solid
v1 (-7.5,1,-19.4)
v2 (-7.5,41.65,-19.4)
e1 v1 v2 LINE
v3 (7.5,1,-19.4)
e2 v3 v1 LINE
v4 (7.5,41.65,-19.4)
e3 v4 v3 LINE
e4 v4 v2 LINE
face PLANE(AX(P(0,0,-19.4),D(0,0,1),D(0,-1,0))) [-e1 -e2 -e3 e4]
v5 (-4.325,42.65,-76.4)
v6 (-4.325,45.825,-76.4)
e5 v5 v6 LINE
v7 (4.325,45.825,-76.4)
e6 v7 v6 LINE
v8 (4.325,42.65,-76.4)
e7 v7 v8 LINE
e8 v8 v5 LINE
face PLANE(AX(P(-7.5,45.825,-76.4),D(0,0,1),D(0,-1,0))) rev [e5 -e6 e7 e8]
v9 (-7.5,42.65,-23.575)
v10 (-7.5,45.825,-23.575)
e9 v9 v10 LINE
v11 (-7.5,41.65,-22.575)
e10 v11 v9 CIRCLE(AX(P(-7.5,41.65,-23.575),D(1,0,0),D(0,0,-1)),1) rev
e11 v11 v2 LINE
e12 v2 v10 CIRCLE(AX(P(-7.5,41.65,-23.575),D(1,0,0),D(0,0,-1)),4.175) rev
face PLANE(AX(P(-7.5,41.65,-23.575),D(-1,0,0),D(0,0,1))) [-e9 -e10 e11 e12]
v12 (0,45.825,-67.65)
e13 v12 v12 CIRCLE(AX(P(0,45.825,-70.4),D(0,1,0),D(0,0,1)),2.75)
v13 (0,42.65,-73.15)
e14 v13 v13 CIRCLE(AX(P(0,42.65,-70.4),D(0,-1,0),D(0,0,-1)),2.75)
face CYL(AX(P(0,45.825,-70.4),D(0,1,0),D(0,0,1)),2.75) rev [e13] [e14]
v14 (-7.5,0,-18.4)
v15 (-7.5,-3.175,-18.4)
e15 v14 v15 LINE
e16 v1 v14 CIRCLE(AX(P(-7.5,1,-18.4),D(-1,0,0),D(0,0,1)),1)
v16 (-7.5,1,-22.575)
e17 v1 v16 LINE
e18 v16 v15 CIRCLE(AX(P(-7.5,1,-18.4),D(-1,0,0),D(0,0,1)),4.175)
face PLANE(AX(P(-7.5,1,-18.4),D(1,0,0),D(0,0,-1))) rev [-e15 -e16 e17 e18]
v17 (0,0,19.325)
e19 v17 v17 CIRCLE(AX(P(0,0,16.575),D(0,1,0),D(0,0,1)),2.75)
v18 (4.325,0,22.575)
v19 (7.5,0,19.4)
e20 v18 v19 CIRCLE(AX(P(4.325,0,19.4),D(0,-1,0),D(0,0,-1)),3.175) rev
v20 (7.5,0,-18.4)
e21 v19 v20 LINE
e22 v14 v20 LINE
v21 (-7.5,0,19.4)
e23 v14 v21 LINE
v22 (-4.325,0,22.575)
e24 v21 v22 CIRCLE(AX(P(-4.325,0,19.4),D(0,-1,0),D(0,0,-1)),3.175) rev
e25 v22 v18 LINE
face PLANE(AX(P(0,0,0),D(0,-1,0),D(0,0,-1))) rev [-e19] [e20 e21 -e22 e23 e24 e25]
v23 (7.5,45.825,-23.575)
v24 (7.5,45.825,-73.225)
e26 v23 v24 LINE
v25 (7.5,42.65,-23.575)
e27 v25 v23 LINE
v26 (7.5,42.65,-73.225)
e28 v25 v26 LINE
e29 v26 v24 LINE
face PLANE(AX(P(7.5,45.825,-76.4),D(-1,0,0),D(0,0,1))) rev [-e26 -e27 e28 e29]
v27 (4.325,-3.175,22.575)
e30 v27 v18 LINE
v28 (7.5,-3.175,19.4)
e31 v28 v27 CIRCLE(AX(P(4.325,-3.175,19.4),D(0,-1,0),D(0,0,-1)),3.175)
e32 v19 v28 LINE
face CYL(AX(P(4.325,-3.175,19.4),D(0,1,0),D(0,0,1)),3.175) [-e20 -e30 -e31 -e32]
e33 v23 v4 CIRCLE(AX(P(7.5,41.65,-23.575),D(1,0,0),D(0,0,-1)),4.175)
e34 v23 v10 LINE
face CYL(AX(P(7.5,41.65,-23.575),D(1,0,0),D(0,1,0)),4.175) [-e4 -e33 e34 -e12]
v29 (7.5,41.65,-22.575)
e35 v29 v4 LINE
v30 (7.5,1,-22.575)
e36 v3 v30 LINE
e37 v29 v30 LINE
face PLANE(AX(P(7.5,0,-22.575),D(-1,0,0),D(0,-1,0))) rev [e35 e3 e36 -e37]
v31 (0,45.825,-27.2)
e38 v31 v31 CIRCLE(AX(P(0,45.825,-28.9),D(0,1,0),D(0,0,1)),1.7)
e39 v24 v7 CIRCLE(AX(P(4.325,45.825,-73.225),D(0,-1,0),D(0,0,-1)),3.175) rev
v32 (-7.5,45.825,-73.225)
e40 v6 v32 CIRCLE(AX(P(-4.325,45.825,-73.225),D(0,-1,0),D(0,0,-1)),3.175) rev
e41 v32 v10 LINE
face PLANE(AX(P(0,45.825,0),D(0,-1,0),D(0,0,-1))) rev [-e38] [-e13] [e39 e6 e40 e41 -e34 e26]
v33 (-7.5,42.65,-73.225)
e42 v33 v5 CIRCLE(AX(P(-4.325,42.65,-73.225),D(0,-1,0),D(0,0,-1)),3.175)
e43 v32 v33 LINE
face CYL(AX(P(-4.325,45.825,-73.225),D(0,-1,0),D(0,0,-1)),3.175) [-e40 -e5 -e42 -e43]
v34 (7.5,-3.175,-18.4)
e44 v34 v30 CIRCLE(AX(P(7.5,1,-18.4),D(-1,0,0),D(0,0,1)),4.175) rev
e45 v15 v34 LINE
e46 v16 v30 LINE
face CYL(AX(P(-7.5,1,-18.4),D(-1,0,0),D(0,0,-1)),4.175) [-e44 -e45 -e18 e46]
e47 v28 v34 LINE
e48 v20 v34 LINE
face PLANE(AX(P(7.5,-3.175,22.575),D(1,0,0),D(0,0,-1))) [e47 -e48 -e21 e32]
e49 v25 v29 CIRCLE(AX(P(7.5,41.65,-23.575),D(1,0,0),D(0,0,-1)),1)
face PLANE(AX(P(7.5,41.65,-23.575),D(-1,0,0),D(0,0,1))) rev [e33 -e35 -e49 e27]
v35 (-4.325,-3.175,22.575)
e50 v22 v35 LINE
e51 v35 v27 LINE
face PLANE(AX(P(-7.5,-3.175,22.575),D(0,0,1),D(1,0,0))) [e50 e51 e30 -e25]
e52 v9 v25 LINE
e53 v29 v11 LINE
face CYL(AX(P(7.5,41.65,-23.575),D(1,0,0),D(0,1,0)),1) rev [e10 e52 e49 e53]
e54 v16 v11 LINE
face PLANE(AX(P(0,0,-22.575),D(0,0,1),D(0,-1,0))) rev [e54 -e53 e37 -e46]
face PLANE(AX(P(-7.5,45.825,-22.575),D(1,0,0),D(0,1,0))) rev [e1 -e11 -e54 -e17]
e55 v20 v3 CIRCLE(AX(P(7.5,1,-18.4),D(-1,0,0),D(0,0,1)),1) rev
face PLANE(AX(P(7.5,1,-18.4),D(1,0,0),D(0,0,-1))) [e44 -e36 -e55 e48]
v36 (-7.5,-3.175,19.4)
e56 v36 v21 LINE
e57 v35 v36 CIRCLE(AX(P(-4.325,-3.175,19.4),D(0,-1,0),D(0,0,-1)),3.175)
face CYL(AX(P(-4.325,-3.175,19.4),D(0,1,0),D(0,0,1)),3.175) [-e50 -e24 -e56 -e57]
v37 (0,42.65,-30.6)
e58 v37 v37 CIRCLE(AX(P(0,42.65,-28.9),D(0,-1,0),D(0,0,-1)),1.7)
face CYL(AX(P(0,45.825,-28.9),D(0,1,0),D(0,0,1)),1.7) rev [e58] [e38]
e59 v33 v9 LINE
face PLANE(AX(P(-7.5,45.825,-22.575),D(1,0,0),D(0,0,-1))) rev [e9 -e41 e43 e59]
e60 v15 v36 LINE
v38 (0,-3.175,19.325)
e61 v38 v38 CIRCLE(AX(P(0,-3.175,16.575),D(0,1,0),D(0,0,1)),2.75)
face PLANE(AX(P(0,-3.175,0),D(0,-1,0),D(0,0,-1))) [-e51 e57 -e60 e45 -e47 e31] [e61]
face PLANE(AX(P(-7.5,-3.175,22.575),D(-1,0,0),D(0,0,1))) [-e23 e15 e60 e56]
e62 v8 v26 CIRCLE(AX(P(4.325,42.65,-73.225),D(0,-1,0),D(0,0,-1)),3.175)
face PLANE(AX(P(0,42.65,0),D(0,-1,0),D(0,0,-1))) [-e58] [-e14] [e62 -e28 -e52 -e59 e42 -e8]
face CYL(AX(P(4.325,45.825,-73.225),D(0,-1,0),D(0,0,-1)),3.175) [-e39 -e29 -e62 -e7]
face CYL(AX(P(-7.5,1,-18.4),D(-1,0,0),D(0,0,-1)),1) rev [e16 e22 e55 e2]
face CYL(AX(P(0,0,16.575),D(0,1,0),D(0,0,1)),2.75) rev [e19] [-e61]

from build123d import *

# Parameters (mm, degrees)
SKETCH1_W                    = 15
SKETCH1_H                    = 45.15
BASE_FLANGE1_DEPTH           = 3.175
EDGE_FLANGE1_STRIP_W         = 14.7
EDGE_FLANGE1_STRIP_H         = 3.175
EDGE_FLANGE1_STRIP_CUT_DEPTH = 15
EDGE_FLANGE1_DEPTH           = 15
EDGE_FLANGE2_STRIP_W         = 14.7
EDGE_FLANGE2_STRIP_H         = 3.175
EDGE_FLANGE2_STRIP_CUT_DEPTH = 15
EDGE_FLANGE2_DEPTH           = 15
M5_CLEARANCE_HOLE2_D         = 5.5
M5_CLEARANCE_HOLE1_D         = 5.5
M3_CLEARANCE_HOLE1_D         = 3.4
FILLET1_R                    = 3.175


# Sheet-metal steps are written as plain solids
with BuildPart() as part:
    # Sketch1 → Base-Flange1 (new body)
    with BuildSketch(Plane(origin=(0, 0, 0), x_dir=(1, 0, 0), z_dir=(0, 1, 0))):
        Rectangle(SKETCH1_W, SKETCH1_H)
    extrude(amount=-BASE_FLANGE1_DEPTH)

    # Edge-Flange1 strip (across the edge) → Edge-Flange1 strip cut (cut)
    with BuildSketch(Plane(origin=(7.5, 0, -22.575), x_dir=(0, 0, 1), z_dir=(-1, 0, 0))):
        with Locations((-3.175, -1.5875)):
            Rectangle(EDGE_FLANGE1_STRIP_W, EDGE_FLANGE1_STRIP_H)
    extrude(amount=EDGE_FLANGE1_STRIP_CUT_DEPTH, mode=Mode.SUBTRACT)

    # Edge-Flange1 section (across the edge) → Edge-Flange1 (add)
    with BuildSketch(Plane(origin=(7.5, 0, -22.575), x_dir=(0, 0, 1), z_dir=(-1, 0, 0))):
        with BuildLine():
            Line((0, 1), (0, 45.825))
            Line((0, 45.825), (3.175, 45.825))
            Line((3.175, 45.825), (3.175, 1))
            ThreePointArc((3.175, 1), (3.467893219, 0.292893219), (4.175, 0))
            Line((4.175, 0), (4.175, -3.175))
            ThreePointArc((4.175, -3.175), (1.222829189, -1.952170811), (0, 1))
        make_face()
    extrude(amount=EDGE_FLANGE1_DEPTH)

    # Edge-Flange2 strip (across the edge) → Edge-Flange2 strip cut (cut)
    with BuildSketch(Plane(origin=(-7.5, 45.825, -22.575), x_dir=(0, -1, 0), z_dir=(1, 0, 0))):
        with Locations((-3.175, -1.5875)):
            Rectangle(EDGE_FLANGE2_STRIP_W, EDGE_FLANGE2_STRIP_H)
    extrude(amount=EDGE_FLANGE2_STRIP_CUT_DEPTH, mode=Mode.SUBTRACT)

    # Edge-Flange2 section (across the edge) → Edge-Flange2 (add)
    with BuildSketch(Plane(origin=(-7.5, 45.825, -22.575), x_dir=(0, -1, 0), z_dir=(1, 0, 0))):
        with BuildLine():
            Line((0, 1), (0, 53.825))
            Line((0, 53.825), (3.175, 53.825))
            Line((3.175, 53.825), (3.175, 1))
            ThreePointArc((3.175, 1), (3.467893219, 0.292893219), (4.175, 0))
            Line((4.175, 0), (4.175, -3.175))
            ThreePointArc((4.175, -3.175), (1.222829189, -1.952170811), (0, 1))
        make_face()
    extrude(amount=EDGE_FLANGE2_DEPTH)

    # M5 Clearance Hole2 (through all)
    with Locations(Plane(origin=(0, 0, 0), x_dir=(1, 0, 0), z_dir=(0, 1, 0))):
        with Locations((0, -16.575)):
            Hole(M5_CLEARANCE_HOLE2_D / 2)

    # M5 Clearance Hole1 (through all)
    with Locations(Plane(origin=(0, 45.825, 0), x_dir=(1, 0, 0), z_dir=(0, 1, 0))):
        with Locations((0, 70.4)):
            Hole(M5_CLEARANCE_HOLE1_D / 2)

    # M3 Clearance Hole1 (through all)
    with Locations(Plane(origin=(0, 45.825, 0), x_dir=(1, 0, 0), z_dir=(0, 1, 0))):
        with Locations((0, 28.9)):
            Hole(M3_CLEARANCE_HOLE1_D / 2)

    # Fillet1
    fillet1_edges = [part.edges().sort_by_distance(p)[0] for p in [
        (-7.5, 44.2375, -76.4),
        (7.5, 44.2375, -76.4),
        (7.5, -1.5875, 22.575),
        (-7.5, -1.5875, 22.575),
    ]]
    fillet(fillet1_edges, radius=FILLET1_R)


solid = part.part
